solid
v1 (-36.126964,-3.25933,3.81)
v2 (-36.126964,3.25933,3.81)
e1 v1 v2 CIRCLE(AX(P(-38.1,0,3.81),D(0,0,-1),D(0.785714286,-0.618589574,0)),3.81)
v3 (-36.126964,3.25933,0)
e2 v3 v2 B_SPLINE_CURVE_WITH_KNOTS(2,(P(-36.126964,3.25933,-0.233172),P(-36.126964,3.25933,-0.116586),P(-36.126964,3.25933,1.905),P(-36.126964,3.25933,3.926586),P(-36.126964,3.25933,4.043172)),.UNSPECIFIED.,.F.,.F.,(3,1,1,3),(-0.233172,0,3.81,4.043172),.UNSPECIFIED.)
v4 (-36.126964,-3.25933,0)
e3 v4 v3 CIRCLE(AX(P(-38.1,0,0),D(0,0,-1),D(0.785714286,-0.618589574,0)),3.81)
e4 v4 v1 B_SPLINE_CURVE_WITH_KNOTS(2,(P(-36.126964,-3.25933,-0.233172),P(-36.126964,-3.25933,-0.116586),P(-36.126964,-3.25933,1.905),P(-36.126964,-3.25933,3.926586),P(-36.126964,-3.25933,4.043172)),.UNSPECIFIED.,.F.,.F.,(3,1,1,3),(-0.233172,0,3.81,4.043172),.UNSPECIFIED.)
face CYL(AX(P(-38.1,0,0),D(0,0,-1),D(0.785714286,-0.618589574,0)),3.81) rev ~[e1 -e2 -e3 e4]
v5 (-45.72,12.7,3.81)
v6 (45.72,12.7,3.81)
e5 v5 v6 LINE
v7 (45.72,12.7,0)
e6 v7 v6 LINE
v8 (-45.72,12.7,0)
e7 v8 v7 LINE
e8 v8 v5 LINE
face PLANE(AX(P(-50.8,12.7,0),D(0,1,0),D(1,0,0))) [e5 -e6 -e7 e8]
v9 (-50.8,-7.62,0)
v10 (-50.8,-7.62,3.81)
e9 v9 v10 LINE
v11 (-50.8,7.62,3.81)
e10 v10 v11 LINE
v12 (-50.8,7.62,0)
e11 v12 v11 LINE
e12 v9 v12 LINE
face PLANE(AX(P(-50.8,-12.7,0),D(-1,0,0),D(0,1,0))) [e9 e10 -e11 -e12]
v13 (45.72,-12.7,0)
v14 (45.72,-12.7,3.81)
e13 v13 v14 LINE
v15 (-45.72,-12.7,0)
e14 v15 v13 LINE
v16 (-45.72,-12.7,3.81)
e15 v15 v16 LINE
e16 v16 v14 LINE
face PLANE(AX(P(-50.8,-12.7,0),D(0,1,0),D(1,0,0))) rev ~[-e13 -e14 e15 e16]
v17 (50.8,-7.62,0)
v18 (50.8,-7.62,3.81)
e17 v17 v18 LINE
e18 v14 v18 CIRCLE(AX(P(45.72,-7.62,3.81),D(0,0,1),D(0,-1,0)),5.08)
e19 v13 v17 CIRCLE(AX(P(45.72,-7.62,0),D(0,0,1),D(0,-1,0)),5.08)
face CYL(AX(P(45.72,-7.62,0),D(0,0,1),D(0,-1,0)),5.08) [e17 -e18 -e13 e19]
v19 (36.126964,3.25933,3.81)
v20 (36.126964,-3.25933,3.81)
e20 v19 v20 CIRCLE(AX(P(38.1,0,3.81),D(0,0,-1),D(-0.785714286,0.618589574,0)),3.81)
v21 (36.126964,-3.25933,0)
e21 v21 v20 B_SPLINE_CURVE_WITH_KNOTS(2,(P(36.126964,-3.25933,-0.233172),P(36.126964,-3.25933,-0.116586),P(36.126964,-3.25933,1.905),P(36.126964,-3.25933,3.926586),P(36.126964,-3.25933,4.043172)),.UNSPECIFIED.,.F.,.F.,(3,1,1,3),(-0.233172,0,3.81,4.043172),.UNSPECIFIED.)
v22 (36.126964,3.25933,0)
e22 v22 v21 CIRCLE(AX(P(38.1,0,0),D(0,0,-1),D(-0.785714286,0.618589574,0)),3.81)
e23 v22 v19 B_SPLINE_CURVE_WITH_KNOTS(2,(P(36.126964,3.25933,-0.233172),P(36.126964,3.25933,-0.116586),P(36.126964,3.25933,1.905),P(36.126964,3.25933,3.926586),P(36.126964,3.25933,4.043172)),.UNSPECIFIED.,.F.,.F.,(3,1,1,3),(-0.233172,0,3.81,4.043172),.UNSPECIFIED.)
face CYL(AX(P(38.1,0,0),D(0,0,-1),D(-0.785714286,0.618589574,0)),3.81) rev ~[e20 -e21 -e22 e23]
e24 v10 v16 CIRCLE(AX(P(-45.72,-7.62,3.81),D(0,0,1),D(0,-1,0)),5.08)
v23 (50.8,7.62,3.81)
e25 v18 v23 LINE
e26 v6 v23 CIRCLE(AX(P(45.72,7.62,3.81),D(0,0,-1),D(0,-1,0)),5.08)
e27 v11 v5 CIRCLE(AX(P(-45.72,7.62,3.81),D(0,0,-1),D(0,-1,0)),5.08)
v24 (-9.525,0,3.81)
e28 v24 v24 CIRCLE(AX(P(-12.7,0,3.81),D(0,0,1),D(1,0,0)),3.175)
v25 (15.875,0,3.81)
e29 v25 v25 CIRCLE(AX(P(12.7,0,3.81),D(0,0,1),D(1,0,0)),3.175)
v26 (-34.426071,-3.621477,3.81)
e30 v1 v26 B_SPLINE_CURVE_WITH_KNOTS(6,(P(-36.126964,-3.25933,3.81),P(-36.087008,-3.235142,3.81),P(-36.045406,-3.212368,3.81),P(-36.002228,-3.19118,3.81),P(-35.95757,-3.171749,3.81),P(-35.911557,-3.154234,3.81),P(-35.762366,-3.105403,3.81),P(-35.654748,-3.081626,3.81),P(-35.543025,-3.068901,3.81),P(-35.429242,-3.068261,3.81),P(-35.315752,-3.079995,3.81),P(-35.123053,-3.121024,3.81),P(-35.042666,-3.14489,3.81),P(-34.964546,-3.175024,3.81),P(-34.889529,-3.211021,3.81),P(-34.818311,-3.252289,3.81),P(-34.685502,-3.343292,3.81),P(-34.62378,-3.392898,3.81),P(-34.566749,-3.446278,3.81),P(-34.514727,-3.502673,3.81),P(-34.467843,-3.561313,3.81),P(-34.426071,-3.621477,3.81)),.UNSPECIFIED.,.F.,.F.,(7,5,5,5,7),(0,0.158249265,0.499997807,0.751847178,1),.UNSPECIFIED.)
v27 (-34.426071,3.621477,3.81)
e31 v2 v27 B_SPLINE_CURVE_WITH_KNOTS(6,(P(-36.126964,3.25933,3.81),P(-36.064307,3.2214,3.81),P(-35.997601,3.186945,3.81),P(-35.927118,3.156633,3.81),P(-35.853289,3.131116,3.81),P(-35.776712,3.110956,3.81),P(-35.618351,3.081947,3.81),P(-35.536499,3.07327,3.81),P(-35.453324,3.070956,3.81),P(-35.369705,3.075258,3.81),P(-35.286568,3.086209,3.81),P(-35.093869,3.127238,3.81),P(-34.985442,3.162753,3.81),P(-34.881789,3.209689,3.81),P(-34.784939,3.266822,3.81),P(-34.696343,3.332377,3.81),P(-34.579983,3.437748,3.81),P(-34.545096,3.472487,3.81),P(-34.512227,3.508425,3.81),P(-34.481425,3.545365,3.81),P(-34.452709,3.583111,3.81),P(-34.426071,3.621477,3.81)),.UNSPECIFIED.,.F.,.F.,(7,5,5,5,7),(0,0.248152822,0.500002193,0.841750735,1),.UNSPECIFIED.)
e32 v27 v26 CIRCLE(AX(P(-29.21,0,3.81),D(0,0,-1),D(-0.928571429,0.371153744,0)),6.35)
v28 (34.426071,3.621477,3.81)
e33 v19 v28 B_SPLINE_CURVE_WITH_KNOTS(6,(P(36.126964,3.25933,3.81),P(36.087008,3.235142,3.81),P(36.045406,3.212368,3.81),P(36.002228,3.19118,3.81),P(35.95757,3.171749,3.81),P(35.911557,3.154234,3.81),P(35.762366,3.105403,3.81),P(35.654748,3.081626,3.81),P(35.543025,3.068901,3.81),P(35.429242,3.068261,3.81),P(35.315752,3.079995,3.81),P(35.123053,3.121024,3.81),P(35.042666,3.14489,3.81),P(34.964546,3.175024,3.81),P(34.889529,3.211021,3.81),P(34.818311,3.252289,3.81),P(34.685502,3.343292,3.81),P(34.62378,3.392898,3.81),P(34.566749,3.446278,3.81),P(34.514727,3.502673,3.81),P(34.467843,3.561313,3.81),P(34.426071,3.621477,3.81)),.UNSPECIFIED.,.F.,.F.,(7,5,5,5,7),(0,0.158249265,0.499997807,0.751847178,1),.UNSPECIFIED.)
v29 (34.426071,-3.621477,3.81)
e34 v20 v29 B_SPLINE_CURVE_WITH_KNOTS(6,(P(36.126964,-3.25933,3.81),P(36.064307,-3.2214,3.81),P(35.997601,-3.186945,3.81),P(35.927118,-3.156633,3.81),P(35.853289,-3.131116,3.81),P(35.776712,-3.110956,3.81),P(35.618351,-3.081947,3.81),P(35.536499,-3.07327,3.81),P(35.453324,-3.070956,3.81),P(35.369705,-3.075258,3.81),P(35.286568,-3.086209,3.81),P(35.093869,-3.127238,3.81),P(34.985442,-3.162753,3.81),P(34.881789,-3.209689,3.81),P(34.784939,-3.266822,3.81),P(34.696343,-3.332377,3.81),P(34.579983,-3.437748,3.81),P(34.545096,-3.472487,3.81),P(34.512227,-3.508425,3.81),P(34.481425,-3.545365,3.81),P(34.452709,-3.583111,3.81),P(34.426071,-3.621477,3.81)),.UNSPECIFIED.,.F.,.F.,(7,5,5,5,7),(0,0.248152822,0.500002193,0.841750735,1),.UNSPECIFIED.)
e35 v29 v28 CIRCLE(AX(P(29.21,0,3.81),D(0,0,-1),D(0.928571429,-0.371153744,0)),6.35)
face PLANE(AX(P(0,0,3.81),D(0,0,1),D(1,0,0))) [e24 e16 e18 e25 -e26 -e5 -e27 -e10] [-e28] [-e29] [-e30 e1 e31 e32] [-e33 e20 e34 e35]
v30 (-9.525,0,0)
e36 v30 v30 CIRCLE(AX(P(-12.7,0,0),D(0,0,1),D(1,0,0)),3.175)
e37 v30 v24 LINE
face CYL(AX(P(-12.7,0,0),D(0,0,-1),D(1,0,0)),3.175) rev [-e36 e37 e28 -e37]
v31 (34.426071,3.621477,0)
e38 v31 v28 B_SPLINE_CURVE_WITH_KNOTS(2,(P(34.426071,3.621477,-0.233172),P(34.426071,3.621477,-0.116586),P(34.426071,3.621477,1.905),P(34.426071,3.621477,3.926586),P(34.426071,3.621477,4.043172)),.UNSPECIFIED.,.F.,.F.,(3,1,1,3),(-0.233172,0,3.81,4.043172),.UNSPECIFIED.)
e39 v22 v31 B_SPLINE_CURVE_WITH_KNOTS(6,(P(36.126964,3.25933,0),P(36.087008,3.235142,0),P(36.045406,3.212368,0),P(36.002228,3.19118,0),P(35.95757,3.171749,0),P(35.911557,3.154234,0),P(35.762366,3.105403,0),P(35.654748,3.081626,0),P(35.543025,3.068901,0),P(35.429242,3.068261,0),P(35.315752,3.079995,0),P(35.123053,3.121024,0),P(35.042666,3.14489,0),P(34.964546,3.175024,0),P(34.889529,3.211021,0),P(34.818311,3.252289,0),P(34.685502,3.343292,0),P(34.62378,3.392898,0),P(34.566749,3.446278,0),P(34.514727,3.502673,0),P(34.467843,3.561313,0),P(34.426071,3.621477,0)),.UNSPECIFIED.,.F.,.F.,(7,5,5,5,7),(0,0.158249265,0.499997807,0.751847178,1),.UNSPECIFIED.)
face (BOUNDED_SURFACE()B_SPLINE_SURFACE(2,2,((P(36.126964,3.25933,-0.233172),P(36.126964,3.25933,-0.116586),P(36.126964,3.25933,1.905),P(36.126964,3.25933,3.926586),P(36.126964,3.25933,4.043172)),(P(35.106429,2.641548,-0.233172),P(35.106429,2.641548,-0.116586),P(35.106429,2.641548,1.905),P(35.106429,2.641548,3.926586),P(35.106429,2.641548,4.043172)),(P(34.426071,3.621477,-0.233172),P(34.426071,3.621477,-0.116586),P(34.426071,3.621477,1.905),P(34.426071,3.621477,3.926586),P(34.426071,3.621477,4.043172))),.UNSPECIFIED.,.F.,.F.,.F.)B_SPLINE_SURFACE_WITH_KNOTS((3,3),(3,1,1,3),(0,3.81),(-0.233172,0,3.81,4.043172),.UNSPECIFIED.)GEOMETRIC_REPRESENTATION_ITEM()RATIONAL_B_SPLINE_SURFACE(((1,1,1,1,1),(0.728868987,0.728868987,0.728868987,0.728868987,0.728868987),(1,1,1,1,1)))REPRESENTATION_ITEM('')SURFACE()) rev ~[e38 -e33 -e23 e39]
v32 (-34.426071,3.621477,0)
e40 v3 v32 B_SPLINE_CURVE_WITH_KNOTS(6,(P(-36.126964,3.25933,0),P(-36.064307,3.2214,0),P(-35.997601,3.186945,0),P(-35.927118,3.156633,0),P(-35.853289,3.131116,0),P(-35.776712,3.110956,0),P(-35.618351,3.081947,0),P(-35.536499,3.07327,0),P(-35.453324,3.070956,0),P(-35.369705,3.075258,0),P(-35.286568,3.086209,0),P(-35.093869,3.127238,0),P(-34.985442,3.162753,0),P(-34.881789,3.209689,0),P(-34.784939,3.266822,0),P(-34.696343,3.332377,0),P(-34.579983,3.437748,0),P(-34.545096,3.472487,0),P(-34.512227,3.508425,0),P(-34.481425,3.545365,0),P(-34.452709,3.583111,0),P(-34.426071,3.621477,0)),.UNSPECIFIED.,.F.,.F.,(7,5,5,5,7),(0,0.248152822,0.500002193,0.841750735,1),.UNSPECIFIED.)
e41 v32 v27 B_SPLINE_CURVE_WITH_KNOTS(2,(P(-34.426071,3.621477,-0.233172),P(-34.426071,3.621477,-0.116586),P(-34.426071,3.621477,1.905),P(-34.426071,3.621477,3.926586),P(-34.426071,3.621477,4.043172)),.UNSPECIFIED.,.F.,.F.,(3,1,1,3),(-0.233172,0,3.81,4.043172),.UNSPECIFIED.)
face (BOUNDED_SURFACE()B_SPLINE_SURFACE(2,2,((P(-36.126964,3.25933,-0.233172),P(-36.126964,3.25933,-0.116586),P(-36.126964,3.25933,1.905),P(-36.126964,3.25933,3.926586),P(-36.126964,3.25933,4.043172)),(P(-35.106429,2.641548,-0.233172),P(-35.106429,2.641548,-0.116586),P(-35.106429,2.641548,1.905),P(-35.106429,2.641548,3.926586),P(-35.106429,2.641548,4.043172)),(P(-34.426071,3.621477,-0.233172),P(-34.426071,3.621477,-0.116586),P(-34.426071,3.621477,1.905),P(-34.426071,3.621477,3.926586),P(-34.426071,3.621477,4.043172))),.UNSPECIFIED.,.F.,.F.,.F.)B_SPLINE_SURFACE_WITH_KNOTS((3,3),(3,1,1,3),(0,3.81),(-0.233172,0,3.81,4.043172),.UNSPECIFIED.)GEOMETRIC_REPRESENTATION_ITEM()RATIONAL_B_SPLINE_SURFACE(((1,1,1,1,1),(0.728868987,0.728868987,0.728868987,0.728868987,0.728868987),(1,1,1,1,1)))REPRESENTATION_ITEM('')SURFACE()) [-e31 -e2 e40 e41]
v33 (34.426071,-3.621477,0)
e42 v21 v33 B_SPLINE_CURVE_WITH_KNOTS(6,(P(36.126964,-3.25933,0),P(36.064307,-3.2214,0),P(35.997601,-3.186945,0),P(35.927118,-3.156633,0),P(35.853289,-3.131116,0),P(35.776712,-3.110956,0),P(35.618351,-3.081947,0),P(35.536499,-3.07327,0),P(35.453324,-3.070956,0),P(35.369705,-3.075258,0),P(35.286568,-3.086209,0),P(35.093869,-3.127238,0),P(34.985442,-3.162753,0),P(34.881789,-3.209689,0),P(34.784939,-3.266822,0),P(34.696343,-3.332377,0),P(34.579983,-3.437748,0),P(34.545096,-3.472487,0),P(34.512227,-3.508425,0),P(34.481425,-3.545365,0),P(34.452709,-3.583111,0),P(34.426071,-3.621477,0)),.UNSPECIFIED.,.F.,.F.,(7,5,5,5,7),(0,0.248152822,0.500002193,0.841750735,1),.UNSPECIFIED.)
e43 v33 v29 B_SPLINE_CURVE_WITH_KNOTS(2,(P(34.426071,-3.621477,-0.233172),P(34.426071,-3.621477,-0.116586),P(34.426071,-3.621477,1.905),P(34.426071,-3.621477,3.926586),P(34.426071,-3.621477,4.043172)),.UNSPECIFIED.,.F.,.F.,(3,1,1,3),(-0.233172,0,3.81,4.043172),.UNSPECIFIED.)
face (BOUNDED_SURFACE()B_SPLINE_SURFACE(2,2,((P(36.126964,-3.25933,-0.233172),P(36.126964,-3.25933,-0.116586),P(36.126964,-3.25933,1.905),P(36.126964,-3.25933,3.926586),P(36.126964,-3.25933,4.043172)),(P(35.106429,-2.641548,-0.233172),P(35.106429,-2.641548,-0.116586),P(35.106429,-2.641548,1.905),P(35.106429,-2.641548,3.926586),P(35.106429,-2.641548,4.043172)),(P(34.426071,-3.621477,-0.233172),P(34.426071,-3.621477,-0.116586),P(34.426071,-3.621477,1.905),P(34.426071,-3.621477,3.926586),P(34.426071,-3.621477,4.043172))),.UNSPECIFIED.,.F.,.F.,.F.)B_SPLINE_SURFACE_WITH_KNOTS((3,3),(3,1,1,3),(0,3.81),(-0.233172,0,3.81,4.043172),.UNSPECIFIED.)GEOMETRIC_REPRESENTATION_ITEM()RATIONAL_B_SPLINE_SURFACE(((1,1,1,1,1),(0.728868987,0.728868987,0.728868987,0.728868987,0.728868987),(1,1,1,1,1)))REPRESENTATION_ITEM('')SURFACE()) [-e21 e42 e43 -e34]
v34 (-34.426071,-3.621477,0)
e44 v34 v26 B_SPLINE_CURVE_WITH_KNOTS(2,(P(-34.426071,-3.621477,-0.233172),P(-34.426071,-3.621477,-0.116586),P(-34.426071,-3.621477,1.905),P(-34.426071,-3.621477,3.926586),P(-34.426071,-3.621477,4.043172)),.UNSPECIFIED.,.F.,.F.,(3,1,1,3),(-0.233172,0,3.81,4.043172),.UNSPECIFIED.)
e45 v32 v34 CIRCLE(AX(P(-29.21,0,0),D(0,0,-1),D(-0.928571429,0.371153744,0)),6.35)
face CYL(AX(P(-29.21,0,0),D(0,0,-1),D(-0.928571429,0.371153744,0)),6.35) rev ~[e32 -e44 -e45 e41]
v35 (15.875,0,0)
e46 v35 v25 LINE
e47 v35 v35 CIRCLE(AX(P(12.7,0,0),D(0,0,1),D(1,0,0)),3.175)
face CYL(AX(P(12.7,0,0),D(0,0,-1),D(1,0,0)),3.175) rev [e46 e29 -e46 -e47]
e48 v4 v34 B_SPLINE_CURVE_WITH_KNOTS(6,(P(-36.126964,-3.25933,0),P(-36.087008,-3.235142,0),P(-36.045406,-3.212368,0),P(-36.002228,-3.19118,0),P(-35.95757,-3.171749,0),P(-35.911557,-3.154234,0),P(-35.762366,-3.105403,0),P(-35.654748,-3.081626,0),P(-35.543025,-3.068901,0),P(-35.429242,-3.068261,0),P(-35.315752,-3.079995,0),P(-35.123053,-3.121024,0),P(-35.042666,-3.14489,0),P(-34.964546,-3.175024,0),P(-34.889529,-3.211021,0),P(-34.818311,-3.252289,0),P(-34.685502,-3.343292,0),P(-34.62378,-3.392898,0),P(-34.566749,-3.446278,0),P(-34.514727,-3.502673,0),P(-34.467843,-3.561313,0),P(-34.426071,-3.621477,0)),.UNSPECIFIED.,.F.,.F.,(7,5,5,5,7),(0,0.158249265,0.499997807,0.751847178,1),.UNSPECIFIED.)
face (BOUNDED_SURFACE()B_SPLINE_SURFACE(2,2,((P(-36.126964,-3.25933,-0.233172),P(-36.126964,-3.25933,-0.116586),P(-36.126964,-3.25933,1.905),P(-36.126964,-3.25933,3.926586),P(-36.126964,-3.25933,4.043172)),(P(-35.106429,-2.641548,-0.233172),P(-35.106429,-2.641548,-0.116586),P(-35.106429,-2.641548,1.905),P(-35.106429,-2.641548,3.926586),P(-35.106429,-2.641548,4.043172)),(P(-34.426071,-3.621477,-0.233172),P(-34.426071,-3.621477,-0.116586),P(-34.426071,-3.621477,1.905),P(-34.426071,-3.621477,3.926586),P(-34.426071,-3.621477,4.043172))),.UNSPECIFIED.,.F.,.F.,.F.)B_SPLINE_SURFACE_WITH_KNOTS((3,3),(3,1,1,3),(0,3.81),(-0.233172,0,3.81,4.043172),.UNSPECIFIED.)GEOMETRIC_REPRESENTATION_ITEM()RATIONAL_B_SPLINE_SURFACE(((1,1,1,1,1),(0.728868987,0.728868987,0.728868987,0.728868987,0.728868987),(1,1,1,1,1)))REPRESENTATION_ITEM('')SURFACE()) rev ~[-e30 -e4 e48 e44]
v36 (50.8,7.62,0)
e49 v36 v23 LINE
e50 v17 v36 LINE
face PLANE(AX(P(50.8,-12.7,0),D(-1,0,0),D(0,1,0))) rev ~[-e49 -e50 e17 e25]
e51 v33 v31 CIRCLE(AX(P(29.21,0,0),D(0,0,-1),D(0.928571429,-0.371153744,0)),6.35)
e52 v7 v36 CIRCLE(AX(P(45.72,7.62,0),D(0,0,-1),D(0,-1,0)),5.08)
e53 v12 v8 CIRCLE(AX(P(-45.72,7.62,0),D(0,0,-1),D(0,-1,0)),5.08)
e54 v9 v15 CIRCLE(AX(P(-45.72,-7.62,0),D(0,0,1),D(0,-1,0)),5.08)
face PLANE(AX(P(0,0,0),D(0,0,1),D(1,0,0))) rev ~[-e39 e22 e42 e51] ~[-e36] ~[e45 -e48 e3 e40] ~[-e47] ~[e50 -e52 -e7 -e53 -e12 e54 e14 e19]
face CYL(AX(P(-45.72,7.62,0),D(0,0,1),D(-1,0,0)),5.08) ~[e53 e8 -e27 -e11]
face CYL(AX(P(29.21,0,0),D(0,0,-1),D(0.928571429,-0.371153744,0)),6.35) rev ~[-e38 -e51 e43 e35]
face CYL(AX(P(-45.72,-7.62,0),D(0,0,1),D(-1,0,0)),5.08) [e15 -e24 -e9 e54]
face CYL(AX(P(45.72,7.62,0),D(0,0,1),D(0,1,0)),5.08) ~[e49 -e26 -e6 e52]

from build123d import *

# Parameters (mm, degrees)
F0_W     = 101.6
F0_H     = 25.4
F0_R     = 3.175
F1_DEPTH = 3.81
F2_R     = 1.27
F3_R     = 5.08


with BuildPart() as f1:
    # F0 (on Top) → F1 (new body)
    with BuildSketch(Plane.XY):
        Rectangle(F0_W, F0_H)
        with BuildLine():
            ThreePointArc((-35.1064285714, 2.3568262774), (-22.86, 0), (-35.1064285714, -2.3568262774))
            ThreePointArc((-35.1064285714, -2.3568262774), (-41.91, 0), (-35.1064285714, 2.3568262774))
        make_face(mode=Mode.SUBTRACT)
        with Locations((-12.7, 0)):
            Circle(F0_R, mode=Mode.SUBTRACT)
        with Locations((12.7, 0)):
            Circle(F0_R, mode=Mode.SUBTRACT)
        with BuildLine():
            ThreePointArc((35.1064285714, -2.3568262774), (22.86, 0), (35.1064285714, 2.3568262774))
            ThreePointArc((35.1064285714, 2.3568262774), (41.91, 0), (35.1064285714, -2.3568262774))
        make_face(mode=Mode.SUBTRACT)
    extrude(amount=F1_DEPTH)

    # F2
    f2_edges = [f1.edges().sort_by_distance(p)[0] for p in [
        (-35.106429, -2.356826, 1.905),
        (35.106429, 2.356826, 1.905),
        (-35.106429, 2.356826, 1.905),
        (35.106429, -2.356826, 1.905),
    ]]
    fillet(f2_edges, radius=F2_R)

    # F3
    f3_edges = [f1.edges().sort_by_distance(p)[0] for p in [
        (-50.8, 12.7, 1.905),
        (-50.8, -12.7, 1.905),
        (50.8, -12.7, 1.905),
        (50.8, 12.7, 1.905),
    ]]
    fillet(f3_edges, radius=F3_R)


solid = f1.part
